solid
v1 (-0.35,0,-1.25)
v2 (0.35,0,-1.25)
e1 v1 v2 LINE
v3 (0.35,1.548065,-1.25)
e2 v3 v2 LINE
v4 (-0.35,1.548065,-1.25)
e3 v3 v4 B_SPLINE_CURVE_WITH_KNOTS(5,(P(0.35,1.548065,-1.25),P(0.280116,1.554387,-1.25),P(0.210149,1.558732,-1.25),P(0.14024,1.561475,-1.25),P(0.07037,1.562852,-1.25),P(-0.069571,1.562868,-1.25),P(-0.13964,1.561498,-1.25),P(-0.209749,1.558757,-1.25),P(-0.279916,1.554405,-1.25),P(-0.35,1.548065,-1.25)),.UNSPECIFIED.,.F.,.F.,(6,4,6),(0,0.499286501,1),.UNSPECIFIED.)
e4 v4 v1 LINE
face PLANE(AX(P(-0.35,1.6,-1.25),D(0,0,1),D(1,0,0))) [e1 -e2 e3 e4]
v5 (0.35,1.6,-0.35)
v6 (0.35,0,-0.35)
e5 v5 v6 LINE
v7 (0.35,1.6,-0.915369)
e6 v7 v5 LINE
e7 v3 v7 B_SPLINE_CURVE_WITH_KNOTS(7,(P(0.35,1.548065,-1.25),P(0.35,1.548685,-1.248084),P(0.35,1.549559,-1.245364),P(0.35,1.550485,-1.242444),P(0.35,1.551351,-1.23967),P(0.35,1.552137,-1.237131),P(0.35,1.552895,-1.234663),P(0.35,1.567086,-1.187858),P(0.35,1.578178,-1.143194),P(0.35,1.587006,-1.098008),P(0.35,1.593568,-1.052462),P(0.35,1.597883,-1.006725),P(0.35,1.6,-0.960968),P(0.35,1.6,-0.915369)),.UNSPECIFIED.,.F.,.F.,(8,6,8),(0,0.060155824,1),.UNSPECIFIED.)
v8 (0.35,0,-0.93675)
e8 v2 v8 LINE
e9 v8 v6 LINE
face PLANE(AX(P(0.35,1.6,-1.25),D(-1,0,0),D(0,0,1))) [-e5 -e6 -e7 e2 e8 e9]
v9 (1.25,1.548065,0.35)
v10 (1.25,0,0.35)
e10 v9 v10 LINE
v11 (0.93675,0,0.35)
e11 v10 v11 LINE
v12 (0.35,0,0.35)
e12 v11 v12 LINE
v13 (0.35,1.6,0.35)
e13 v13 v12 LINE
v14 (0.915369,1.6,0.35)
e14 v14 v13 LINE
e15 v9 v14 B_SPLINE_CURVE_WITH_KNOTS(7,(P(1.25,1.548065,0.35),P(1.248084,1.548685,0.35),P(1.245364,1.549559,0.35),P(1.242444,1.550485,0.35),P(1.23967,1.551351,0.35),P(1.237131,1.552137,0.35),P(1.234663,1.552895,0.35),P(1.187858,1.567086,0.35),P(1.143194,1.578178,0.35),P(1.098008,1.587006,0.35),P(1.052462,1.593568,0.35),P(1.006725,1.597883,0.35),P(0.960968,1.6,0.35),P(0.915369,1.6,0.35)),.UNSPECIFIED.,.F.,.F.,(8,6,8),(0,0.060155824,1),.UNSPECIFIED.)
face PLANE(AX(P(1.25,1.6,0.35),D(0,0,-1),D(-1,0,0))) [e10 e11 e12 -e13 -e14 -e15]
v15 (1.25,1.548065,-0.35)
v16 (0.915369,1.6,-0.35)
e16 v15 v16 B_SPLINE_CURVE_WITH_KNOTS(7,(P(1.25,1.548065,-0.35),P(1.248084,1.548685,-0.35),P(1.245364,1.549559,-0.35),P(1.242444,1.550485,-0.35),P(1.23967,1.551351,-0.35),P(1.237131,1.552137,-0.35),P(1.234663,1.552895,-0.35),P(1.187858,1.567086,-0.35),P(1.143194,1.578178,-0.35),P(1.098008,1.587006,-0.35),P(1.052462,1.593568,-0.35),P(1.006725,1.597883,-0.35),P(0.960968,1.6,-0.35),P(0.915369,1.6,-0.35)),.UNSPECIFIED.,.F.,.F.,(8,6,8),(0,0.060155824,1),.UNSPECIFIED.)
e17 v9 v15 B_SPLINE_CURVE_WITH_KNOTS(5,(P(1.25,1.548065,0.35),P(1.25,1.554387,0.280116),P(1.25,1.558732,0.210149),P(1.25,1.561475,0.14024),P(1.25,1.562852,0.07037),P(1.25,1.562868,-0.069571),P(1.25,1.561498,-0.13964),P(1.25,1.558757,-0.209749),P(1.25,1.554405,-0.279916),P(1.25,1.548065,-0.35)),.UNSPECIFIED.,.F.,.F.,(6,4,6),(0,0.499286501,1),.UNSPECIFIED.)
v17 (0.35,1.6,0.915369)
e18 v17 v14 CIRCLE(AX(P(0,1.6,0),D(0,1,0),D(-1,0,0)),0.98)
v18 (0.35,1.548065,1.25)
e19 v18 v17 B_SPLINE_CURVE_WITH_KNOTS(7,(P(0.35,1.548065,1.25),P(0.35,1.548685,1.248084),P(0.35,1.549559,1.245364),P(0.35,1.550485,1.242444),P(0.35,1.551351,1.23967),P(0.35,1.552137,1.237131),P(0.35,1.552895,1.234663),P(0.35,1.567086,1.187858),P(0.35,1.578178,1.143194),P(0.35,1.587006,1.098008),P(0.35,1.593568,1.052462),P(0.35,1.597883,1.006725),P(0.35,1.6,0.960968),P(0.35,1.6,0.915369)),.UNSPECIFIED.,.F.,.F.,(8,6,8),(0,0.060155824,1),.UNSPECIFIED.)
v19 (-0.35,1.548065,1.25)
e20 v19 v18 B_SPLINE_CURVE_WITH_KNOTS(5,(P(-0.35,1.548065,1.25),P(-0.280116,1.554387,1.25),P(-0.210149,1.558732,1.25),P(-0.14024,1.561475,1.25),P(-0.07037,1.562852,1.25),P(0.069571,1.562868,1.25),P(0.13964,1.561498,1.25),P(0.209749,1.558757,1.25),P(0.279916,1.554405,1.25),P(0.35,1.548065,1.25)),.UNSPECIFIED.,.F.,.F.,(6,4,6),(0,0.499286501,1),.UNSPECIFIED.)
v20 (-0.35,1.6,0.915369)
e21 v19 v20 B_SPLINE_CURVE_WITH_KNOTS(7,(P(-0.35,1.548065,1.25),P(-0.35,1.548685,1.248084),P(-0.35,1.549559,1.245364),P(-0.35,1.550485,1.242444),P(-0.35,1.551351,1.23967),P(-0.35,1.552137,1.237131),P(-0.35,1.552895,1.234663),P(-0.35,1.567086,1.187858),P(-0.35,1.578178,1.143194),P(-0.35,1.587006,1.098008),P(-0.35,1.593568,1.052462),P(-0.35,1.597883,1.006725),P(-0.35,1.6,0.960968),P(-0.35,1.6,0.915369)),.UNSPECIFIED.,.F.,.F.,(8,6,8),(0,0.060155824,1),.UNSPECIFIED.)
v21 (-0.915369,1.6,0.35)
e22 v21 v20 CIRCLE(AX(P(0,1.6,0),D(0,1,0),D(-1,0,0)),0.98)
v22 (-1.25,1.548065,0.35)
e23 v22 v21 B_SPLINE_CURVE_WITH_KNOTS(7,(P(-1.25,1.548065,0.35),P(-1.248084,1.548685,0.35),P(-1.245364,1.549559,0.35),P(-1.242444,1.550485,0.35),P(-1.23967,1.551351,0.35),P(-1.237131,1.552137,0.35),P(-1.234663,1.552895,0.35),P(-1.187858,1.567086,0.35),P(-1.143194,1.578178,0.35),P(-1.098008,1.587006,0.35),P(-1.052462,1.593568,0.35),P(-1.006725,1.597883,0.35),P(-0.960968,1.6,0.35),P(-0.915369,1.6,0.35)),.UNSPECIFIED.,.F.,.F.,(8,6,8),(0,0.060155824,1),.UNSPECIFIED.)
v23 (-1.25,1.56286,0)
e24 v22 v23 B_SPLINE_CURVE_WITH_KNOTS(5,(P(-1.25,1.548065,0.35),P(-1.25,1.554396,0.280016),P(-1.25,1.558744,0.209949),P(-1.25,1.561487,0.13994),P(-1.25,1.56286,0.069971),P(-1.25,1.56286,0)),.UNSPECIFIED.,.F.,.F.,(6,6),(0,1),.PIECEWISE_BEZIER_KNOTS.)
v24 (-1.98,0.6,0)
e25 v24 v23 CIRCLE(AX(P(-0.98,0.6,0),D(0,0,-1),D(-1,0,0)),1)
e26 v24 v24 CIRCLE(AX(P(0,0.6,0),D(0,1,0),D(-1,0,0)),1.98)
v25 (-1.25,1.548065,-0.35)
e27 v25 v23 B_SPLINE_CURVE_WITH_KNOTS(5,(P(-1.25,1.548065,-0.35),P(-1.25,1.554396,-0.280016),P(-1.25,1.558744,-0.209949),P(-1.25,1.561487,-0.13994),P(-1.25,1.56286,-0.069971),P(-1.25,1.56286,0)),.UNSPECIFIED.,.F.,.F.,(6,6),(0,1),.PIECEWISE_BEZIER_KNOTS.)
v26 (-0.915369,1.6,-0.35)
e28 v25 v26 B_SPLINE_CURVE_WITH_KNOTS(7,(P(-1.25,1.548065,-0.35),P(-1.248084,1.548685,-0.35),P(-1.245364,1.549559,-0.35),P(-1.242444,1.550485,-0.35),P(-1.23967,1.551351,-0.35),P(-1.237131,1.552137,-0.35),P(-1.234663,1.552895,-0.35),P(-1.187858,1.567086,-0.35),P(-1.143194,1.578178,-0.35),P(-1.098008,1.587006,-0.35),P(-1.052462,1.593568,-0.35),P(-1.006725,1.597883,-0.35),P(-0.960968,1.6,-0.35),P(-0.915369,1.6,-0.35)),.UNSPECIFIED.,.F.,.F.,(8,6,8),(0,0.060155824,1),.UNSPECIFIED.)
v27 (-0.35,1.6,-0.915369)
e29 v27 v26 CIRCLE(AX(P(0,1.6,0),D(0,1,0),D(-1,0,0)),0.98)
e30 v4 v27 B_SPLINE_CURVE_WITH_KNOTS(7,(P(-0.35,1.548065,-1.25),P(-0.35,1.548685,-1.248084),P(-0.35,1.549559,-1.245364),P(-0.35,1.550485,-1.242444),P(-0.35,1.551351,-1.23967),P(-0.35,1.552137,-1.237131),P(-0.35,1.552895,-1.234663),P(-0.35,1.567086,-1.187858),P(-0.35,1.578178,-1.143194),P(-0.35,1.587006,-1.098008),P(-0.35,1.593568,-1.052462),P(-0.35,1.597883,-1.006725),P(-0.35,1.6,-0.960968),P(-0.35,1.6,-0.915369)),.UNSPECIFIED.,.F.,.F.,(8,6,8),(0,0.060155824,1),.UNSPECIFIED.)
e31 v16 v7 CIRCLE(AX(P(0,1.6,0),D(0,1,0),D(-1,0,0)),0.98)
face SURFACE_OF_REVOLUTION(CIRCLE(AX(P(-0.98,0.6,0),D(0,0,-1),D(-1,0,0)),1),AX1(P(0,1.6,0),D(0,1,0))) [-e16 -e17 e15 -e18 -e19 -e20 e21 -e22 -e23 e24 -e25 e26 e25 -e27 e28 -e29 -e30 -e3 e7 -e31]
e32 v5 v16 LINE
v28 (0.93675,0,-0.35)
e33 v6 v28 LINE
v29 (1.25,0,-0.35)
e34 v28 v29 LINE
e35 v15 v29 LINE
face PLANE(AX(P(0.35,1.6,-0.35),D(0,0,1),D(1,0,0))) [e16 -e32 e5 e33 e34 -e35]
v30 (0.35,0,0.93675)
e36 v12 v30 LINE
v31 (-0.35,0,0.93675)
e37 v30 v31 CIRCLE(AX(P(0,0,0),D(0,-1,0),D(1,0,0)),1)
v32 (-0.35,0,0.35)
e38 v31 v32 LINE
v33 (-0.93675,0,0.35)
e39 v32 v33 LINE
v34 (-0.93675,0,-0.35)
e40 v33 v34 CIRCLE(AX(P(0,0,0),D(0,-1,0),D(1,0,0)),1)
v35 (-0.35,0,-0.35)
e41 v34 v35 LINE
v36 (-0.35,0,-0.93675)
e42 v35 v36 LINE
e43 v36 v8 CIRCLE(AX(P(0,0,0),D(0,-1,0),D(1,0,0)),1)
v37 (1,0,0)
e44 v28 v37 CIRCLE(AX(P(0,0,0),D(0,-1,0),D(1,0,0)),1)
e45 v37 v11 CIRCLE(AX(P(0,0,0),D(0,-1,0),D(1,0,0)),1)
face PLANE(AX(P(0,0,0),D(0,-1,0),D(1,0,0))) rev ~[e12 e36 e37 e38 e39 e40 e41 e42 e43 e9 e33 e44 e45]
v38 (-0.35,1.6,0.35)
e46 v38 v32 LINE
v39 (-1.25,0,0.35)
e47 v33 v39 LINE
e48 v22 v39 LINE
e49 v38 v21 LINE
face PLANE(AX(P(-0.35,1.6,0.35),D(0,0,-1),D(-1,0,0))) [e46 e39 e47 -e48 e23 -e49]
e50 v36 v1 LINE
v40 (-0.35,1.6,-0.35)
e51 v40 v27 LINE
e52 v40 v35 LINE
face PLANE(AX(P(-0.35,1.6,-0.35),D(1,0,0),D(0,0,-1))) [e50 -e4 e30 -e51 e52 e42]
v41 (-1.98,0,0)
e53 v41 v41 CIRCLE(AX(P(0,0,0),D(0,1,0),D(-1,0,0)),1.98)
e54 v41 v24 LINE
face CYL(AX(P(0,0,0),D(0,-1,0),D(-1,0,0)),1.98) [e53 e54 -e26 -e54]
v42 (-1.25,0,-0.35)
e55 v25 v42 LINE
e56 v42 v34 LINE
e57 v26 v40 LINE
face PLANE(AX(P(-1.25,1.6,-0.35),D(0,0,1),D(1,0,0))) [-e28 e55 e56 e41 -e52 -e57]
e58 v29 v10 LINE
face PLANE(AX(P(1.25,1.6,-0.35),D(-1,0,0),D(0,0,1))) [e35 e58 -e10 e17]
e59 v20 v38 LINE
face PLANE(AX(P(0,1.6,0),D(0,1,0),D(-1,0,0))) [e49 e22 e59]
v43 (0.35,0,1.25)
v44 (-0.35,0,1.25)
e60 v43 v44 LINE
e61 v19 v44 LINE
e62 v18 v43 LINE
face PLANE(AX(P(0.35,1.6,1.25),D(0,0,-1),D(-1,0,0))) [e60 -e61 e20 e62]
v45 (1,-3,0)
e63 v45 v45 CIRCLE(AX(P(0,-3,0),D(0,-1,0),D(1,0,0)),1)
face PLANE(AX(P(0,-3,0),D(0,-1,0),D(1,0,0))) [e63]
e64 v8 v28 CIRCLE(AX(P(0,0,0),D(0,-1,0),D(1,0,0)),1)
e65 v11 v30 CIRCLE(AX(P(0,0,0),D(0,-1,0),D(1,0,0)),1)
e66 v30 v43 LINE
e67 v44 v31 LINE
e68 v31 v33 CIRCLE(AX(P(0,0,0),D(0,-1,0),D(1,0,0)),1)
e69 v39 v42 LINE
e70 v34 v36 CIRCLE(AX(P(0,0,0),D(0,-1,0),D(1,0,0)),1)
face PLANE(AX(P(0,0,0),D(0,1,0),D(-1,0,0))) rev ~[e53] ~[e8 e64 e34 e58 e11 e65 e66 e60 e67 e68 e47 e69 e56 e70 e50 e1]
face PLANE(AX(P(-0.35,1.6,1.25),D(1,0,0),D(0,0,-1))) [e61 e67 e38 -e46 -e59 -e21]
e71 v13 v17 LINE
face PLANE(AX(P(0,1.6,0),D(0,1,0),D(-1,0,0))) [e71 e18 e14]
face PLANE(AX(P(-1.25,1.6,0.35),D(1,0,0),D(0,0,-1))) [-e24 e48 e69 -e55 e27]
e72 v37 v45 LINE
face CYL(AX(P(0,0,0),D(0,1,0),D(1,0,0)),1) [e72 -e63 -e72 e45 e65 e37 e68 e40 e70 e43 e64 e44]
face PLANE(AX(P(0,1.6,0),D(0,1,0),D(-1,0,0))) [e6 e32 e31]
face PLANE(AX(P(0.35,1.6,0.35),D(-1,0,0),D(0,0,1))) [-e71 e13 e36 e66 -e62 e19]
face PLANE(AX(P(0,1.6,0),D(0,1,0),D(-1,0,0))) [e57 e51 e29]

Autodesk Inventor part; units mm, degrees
ref_plane "YZ Plane" through (0, 0, 0) normal (1, 0, 0) x (0, 1, 0)
ref_plane "XZ Plane" through (0, 0, 0) normal (0, 1, 0) x (-1, 0, 0)
ref_plane "XY Plane" through (0, 0, 0) normal (0, 0, 1) x (1, 0, 0)
sketch "Sketch1" plane through (0, 0, 0) normal (0, 1, 0) x (-1, 0, 0)
  circle A0 centre (0, 0) radius 1.98
  dimension "d0" = 3.96
extrude "Extrusion1" add sketch "Sketch1" along normal blind 1.6
sketch "Sketch2" plane through (0, 1.6, 0) normal (0, 1, 0) x (1, 0, 0)
  line L0 (-0.35, -0.35) -> (-1.25, -0.35)
  line L1 (-1.25, -0.35) -> (-1.25, 0.35)
  line L2 (-1.25, 0.35) -> (-0.35, 0.35)
  line L3 (-0.35, 0.35) -> (-0.35, 1.25)
  line L4 (-0.35, 1.25) -> (0.35, 1.25)
  line L5 (0.35, 1.25) -> (0.35, 0.35)
  line L6 (0.35, 0.35) -> (1.25, 0.35)
  line L7 (1.25, 0.35) -> (1.25, -0.35)
  line L8 (1.25, -0.35) -> (0.35, -0.35)
  line L9 (0.35, -1.25) -> (-0.35, -1.25)
  line L10 (-0.35, -1.25) -> (-0.35, -0.35)
  line L11 (0.35, -0.35) -> (0.35, -1.25)
  point P0 (0, 0)
  point P1 (0, -1.25)
  point P2 (0, 1.25)
  point P3 (-1.25, 0)
  point P4 (1.25, 0)
  dimension "d3" = 2.5
  dimension "d4" = 2.5
  dimension "d5" = 1.25
  dimension "d6" = 1.25
  dimension "d7" = 0.7
  dimension "d8" = 0.7
extrude "Extrusion2" cut sketch "Sketch2" against normal blind 2
fillet "Fillet1" radius 1 1 edges at (1.98, 1.6, 0)
sketch "Sketch3" plane through (0, 0, 0) normal (0, -1, 0) x (1, 0, 0)
  circle A0 centre (0, 0) radius 1
  dimension "d12" = 2
extrude "Extrusion3" add sketch "Sketch3" along normal blind 3
thread "Thread1" size "M2x0.4" class "6g" standard "ANSI Metric M Profile" full length
equation "\"d4\" = d3"
equation "\"d5\" = 0.5 * d4"
equation "\"d6\" = d5"
equation "\"d8\" = d7"
properties part number "M4_8mm" material "Stainless Steel"
